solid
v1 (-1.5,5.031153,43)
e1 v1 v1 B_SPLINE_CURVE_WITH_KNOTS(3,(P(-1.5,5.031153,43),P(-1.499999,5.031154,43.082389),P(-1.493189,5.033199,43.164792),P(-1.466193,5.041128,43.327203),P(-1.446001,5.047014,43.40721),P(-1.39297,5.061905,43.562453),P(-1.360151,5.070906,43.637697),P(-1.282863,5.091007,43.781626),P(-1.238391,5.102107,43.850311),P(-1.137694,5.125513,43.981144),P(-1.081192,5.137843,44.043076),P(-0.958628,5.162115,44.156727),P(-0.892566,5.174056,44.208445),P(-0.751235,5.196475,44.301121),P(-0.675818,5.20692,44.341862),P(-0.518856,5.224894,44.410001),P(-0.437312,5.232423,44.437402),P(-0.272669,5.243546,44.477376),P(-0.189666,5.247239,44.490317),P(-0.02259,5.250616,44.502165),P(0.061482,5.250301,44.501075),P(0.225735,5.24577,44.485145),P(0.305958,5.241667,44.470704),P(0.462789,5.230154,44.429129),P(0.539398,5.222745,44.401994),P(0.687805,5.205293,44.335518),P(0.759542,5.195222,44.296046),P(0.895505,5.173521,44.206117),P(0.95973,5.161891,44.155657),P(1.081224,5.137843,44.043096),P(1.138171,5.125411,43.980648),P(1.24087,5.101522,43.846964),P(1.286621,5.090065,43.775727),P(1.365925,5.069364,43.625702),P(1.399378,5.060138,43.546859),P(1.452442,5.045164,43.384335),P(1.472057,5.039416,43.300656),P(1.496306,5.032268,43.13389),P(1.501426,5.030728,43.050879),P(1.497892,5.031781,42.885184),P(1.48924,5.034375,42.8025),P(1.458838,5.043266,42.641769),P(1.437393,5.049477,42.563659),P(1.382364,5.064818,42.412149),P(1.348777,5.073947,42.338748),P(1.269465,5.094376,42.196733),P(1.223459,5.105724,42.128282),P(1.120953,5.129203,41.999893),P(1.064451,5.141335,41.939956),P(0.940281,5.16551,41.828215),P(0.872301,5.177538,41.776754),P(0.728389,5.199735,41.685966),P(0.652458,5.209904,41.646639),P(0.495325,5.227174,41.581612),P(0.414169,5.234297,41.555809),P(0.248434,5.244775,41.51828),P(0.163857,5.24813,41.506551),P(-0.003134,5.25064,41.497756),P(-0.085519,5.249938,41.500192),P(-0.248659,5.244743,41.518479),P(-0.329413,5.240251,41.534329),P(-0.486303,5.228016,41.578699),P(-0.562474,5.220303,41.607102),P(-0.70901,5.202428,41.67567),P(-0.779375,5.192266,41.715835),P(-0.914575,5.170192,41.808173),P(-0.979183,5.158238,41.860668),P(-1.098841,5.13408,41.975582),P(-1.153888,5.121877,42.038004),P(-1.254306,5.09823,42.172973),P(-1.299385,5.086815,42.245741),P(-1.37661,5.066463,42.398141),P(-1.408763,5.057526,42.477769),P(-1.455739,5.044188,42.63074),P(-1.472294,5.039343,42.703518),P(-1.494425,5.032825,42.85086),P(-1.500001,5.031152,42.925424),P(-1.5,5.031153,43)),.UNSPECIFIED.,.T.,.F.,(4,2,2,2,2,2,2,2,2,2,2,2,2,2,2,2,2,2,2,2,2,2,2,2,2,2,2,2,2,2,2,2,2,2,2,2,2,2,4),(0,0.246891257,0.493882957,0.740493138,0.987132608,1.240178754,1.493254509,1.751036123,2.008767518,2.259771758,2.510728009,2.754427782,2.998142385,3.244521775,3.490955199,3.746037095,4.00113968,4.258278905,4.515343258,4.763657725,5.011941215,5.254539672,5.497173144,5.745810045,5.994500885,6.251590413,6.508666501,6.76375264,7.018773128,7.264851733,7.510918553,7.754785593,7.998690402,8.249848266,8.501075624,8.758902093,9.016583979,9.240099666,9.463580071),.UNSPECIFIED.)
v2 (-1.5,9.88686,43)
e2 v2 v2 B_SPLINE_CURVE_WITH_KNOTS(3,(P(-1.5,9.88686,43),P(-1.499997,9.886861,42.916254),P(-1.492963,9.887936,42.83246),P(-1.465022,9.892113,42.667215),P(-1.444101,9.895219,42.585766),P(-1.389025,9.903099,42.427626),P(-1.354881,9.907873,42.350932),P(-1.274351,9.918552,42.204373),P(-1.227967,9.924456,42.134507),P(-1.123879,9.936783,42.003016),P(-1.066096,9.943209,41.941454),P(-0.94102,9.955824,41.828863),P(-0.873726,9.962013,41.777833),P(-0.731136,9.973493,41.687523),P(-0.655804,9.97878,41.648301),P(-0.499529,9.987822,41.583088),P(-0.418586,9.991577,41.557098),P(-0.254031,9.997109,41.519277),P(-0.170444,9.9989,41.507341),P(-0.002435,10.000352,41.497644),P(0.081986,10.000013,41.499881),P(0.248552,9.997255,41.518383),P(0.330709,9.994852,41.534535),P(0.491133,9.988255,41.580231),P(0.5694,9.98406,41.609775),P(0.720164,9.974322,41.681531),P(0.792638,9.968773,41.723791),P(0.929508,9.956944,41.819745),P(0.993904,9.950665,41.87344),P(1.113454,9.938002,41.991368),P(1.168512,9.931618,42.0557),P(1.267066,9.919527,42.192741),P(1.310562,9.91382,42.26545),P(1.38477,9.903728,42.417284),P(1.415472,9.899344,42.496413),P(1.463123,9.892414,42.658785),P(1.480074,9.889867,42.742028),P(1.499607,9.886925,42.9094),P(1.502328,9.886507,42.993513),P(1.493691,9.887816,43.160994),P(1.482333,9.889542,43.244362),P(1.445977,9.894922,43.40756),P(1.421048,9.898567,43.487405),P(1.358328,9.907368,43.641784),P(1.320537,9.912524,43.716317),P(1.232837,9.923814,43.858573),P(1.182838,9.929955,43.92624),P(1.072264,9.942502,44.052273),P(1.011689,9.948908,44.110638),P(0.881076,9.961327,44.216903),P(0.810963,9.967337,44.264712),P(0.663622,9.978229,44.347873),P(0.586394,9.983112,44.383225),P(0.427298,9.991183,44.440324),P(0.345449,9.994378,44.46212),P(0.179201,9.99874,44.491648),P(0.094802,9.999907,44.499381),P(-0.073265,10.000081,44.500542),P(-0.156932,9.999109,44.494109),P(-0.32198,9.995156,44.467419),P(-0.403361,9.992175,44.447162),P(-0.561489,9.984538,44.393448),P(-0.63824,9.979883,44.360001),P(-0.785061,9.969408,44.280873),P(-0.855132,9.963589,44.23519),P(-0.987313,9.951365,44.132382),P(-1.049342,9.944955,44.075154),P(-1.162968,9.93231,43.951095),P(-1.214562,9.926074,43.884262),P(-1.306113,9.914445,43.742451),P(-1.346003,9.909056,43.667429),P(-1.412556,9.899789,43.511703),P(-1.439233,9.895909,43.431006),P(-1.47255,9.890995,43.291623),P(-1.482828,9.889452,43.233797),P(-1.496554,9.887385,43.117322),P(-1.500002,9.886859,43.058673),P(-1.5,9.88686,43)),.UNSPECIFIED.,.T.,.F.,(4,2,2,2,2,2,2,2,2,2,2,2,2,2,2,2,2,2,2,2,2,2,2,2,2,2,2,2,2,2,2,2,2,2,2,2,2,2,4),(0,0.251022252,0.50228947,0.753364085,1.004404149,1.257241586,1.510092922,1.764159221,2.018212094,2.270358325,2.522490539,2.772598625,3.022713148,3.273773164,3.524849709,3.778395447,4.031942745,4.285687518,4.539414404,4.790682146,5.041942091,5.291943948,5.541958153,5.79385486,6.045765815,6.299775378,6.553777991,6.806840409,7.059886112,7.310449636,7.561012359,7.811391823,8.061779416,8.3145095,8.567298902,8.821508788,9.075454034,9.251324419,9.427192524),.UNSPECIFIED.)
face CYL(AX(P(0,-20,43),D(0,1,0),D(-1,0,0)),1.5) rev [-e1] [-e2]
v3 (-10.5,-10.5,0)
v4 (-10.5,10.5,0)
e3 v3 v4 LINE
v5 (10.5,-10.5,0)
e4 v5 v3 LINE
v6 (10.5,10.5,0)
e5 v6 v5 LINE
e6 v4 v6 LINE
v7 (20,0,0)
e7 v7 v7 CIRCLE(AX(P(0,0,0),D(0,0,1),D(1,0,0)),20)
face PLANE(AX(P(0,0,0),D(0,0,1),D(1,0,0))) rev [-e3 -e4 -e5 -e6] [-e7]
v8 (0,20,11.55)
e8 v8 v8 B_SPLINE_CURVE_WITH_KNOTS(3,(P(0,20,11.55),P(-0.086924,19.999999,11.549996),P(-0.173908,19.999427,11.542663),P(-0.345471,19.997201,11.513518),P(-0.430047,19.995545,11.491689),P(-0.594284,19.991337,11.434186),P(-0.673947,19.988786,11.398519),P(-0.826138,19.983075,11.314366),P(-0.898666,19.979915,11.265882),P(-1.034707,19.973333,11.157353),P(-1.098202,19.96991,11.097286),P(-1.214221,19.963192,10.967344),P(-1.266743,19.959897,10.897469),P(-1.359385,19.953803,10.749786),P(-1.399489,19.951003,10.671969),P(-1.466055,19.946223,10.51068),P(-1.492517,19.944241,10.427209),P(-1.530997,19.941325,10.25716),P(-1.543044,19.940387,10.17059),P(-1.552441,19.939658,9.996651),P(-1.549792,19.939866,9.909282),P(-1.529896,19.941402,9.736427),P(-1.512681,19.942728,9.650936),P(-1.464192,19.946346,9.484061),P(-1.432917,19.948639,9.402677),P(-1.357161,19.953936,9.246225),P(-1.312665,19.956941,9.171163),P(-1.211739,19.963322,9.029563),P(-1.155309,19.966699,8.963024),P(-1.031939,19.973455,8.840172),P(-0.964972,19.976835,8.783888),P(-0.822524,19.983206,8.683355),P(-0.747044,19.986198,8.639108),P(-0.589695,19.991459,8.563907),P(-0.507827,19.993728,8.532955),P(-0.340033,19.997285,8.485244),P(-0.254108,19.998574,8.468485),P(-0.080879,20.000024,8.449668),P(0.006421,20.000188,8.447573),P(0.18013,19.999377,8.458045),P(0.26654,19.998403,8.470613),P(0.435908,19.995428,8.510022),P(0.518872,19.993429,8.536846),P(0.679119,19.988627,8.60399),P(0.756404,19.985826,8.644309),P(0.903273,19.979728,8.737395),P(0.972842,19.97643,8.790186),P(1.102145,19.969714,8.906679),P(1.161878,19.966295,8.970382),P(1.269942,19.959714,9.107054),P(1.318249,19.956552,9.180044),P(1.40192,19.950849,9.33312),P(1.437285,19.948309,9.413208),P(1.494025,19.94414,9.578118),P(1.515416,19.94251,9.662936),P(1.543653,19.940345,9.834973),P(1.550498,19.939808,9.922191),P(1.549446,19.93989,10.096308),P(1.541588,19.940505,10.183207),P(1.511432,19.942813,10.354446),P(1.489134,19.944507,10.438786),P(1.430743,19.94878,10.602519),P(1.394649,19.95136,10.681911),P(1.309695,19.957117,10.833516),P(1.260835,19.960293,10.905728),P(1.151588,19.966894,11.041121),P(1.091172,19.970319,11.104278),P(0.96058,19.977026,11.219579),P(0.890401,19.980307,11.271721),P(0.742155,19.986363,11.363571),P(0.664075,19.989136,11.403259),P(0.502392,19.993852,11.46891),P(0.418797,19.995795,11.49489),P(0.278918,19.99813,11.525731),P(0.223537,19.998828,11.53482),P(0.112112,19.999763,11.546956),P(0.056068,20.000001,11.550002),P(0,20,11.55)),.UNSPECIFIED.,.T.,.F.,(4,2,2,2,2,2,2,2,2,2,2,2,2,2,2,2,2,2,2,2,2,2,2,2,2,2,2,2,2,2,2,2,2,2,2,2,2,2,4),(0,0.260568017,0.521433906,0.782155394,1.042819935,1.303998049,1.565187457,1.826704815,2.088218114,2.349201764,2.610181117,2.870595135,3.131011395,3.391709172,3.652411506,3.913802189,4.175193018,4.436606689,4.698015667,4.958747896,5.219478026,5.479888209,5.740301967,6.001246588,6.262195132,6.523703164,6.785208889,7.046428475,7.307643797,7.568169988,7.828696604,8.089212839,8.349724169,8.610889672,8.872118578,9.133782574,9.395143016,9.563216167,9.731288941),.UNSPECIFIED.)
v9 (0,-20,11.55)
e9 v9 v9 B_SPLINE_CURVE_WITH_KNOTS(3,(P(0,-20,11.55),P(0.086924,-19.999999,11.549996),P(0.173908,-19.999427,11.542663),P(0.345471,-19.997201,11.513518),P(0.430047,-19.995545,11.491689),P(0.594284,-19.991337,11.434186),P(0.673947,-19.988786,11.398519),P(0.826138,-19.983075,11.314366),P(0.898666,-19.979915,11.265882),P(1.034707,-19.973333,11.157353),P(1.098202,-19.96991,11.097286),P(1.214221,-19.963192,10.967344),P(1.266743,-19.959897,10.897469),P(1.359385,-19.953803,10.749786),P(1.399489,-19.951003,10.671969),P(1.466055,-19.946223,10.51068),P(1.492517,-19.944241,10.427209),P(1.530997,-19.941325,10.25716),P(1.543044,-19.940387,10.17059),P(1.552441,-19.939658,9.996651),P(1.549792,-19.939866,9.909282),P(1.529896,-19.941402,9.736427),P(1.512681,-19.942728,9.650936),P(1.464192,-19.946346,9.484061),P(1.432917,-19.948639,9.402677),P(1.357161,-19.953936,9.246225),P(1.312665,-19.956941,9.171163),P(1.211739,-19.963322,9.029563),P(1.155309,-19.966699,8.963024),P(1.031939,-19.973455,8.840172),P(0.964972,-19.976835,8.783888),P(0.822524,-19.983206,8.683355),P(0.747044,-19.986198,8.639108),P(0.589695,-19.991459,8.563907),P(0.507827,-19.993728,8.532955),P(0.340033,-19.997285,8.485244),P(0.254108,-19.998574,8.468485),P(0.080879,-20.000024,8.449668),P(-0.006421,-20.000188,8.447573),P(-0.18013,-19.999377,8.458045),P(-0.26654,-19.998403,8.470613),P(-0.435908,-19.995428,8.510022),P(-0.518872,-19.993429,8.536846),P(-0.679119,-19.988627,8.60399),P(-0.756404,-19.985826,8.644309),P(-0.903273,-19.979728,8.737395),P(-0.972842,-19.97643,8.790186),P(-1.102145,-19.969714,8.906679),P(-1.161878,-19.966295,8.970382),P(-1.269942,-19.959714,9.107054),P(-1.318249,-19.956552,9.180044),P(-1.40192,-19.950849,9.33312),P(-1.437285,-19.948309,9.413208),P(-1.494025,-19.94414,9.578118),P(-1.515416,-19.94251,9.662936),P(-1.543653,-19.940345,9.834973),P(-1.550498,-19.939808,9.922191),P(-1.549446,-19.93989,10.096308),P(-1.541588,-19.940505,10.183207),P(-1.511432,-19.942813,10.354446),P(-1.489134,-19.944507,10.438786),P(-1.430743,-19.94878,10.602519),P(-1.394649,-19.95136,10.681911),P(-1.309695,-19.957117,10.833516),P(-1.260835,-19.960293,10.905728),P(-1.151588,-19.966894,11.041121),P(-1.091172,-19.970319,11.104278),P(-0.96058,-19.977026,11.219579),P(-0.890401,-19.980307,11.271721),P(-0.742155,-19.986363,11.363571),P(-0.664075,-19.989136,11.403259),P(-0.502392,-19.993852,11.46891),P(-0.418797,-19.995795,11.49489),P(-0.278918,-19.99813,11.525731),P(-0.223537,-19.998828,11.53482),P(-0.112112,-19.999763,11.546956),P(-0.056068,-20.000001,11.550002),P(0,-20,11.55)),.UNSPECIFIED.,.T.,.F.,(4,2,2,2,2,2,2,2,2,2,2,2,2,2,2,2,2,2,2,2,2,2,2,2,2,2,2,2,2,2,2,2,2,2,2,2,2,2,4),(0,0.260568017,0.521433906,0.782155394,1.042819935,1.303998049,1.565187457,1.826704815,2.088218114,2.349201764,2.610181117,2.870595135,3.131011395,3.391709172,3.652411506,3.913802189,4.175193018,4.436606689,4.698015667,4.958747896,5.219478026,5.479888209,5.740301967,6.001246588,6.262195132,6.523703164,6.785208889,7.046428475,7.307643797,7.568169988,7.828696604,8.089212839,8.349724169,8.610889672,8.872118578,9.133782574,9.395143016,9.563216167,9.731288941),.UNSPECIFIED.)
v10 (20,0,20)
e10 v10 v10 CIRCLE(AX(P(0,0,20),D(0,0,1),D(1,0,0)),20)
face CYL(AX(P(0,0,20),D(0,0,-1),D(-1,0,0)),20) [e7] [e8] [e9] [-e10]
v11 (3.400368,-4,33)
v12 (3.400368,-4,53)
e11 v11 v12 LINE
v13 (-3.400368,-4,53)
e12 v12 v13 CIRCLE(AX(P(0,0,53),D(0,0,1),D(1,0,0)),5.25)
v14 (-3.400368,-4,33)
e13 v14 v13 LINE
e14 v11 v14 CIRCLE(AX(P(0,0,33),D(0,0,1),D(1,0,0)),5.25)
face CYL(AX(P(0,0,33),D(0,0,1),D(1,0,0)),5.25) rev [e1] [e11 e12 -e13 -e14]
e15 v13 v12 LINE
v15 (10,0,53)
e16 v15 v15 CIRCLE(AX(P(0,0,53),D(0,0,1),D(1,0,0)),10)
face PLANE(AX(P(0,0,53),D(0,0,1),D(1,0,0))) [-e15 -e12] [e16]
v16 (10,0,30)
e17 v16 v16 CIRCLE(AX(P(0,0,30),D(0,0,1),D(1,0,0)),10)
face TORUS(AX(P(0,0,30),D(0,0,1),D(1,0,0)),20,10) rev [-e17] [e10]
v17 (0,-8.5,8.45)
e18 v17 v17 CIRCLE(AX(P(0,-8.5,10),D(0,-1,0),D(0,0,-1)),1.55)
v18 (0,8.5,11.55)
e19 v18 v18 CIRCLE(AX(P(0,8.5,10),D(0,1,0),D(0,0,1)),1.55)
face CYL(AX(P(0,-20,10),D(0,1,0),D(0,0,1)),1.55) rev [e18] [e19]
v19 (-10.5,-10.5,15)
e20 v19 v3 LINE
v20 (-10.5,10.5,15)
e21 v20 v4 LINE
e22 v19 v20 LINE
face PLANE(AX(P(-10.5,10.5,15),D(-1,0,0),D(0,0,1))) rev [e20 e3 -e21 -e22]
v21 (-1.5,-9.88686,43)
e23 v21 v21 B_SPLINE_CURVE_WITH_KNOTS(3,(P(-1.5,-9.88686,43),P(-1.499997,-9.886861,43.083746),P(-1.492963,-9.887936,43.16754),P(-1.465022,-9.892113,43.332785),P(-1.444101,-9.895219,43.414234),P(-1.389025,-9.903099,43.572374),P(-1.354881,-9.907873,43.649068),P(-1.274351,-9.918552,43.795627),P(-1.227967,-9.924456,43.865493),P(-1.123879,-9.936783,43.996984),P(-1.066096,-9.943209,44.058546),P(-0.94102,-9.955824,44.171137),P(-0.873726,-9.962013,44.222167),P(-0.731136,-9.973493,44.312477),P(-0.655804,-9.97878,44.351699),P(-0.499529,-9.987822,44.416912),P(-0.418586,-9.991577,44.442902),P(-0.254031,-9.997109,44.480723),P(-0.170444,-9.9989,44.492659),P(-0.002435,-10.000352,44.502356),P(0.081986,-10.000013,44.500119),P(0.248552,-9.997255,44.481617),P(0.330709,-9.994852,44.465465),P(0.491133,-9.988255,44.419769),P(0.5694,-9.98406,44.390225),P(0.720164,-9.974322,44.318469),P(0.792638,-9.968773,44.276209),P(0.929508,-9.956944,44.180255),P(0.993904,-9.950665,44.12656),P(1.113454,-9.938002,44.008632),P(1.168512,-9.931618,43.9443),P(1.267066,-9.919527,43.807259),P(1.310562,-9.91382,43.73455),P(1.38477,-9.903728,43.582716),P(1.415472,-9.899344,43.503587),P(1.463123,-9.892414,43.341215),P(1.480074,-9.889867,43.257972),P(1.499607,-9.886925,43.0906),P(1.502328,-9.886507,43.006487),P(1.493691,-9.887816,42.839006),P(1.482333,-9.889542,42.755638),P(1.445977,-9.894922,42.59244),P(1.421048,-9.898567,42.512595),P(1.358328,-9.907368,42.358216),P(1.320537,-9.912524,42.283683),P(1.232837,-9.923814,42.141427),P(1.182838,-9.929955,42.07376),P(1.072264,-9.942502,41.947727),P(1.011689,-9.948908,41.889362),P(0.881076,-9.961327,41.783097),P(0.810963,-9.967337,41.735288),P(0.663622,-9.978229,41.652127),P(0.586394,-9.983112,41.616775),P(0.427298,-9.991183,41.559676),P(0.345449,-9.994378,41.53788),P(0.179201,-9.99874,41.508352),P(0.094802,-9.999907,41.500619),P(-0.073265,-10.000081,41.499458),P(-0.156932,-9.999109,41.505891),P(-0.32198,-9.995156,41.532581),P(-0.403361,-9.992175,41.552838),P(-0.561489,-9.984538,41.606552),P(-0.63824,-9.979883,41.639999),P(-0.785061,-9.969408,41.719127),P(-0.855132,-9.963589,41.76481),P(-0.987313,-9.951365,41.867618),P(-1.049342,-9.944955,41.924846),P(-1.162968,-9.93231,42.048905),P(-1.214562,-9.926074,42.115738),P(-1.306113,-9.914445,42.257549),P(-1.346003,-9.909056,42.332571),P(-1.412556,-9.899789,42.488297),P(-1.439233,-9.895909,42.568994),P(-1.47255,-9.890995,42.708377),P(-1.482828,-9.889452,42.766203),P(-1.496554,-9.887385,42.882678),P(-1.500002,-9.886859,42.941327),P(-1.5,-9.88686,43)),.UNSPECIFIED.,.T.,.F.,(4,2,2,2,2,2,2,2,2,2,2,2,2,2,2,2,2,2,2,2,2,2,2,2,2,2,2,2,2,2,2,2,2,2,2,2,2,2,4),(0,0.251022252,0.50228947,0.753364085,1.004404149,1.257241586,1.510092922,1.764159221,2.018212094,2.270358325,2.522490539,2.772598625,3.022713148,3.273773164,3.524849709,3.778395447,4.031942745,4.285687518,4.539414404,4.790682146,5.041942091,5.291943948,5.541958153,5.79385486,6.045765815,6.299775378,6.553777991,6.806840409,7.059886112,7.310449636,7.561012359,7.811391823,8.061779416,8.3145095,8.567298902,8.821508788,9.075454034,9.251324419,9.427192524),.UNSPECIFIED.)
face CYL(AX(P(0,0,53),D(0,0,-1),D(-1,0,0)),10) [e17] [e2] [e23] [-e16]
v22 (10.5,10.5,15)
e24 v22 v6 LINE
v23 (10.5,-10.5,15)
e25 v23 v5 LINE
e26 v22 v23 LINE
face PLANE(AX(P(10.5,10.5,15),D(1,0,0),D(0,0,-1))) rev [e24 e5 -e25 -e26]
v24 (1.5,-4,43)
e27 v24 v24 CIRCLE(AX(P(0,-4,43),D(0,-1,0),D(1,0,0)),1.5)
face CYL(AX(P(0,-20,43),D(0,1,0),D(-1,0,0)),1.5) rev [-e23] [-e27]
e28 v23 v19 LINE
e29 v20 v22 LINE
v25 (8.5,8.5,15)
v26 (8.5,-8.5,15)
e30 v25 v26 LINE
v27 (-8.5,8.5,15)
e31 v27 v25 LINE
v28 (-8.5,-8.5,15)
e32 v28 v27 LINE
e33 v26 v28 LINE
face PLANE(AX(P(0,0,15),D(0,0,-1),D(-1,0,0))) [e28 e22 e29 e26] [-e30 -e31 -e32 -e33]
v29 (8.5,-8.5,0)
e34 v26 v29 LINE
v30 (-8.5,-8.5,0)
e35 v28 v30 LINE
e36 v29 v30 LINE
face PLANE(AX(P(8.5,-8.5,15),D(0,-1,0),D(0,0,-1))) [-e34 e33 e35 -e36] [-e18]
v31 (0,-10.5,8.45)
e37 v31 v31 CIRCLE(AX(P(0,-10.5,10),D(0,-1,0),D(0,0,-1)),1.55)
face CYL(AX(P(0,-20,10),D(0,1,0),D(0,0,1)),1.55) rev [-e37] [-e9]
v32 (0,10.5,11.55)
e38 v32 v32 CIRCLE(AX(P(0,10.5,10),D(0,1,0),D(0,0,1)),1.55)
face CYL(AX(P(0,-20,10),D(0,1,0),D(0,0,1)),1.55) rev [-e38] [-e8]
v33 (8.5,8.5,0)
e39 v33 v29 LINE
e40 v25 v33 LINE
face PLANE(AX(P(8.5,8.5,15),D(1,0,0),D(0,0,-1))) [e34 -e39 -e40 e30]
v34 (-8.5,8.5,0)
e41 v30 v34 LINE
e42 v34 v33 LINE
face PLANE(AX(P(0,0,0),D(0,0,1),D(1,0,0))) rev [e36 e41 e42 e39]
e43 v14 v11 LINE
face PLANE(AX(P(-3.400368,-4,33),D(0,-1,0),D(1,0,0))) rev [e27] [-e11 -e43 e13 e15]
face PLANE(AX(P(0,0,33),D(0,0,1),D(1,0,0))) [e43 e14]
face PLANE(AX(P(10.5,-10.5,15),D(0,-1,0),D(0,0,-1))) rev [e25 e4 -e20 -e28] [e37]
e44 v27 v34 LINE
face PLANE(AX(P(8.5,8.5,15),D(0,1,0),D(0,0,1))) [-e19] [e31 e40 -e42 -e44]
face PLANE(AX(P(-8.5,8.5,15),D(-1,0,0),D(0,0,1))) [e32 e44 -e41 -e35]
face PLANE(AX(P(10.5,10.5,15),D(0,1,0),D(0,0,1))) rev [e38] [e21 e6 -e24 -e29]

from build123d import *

# Parameters (mm, degrees)
SKETCH_1_R               = 20
EXTRUDE_1_DEPTH          = 20
SKETCH_2_R               = 10
EXTRUDE_2_DEPTH          = 33
SKETCH_4_W               = 21
SKETCH_4_H               = 21
SKETCH_4_W_2             = 17
SKETCH_4_H_2             = 17
CUT_EXTRUDE_3_DEPTH      = 15
CUT_EXTRUDE_4_DEPTH      = 61.074953184
CUT_EXTRUDE_4_DEPTH_BACK = 61.074953184
SKETCH_5_R               = 1.55
FILLET_1_R               = 10
CUT_EXTRUDE_6_DEPTH      = 20
CUT_EXTRUDE_7_DEPTH      = 62.522353742
CUT_EXTRUDE_7_DEPTH_BACK = 62.522353742
SKETCH_9_R               = 1.5


with BuildPart() as part:
    # 草图1 → 凸台-拉伸1 (new body)
    with BuildSketch(Plane.XY):
        Circle(SKETCH_1_R)
    extrude(amount=EXTRUDE_1_DEPTH)

    # 草图2 → 凸台-拉伸2 (add)
    with BuildSketch(Plane.XY.offset(20)):
        Circle(SKETCH_2_R)
    extrude(amount=EXTRUDE_2_DEPTH)

    # 草图4 → 切除-拉伸3 (cut)
    with BuildSketch(Plane(origin=(0, 0, 0), x_dir=(-1, 0, 0), z_dir=(0, 0, -1))):
        Rectangle(SKETCH_4_W, SKETCH_4_H)
        Rectangle(SKETCH_4_W_2, SKETCH_4_H_2, mode=Mode.SUBTRACT)
    extrude(amount=-CUT_EXTRUDE_3_DEPTH, mode=Mode.SUBTRACT)

    # 草图5 → 切除-拉伸4 (cut, two sides: drawn at the far end of the back side and taken through both)
    with BuildSketch(Plane(origin=(0, 0, 0), x_dir=(1, 0, 0), z_dir=(0, 1, 0)).offset(-CUT_EXTRUDE_4_DEPTH_BACK)):
        with Locations(Location((0, -10, 0), (0, 0, 270))):
            Circle(SKETCH_5_R)
    extrude(amount=CUT_EXTRUDE_4_DEPTH + CUT_EXTRUDE_4_DEPTH_BACK, mode=Mode.SUBTRACT)

    # 圆角1
    fillet_1_edges = [part.edges().sort_by_distance(p)[0] for p in [
        (-10, 0, 20),
    ]]
    fillet(fillet_1_edges, radius=FILLET_1_R - 0.0001)  # a hair under: the kernel refuses the full size

    # 草图8 → 切除-拉伸6 (cut)
    with BuildSketch(Plane.XY.offset(53)):
        with BuildLine():
            Line((-3.400367627, -4), (3.400367627, -4))
            ThreePointArc((3.400367627, -4), (0, 5.25), (-3.400367627, -4))
        make_face()
    extrude(amount=-CUT_EXTRUDE_6_DEPTH, mode=Mode.SUBTRACT)

    # 草图9 → 切除-拉伸7 (cut, two sides: drawn at the far end of the back side and taken through both)
    with BuildSketch(Plane(origin=(0, -4, 0), x_dir=(1, 0, 0), z_dir=(0, 1, 0)).offset(-CUT_EXTRUDE_7_DEPTH_BACK)):
        with Locations(Location((0, -43, 0), (0, 0, 180))):
            Circle(SKETCH_9_R)
    extrude(amount=CUT_EXTRUDE_7_DEPTH + CUT_EXTRUDE_7_DEPTH_BACK, mode=Mode.SUBTRACT)


solid = part.part
